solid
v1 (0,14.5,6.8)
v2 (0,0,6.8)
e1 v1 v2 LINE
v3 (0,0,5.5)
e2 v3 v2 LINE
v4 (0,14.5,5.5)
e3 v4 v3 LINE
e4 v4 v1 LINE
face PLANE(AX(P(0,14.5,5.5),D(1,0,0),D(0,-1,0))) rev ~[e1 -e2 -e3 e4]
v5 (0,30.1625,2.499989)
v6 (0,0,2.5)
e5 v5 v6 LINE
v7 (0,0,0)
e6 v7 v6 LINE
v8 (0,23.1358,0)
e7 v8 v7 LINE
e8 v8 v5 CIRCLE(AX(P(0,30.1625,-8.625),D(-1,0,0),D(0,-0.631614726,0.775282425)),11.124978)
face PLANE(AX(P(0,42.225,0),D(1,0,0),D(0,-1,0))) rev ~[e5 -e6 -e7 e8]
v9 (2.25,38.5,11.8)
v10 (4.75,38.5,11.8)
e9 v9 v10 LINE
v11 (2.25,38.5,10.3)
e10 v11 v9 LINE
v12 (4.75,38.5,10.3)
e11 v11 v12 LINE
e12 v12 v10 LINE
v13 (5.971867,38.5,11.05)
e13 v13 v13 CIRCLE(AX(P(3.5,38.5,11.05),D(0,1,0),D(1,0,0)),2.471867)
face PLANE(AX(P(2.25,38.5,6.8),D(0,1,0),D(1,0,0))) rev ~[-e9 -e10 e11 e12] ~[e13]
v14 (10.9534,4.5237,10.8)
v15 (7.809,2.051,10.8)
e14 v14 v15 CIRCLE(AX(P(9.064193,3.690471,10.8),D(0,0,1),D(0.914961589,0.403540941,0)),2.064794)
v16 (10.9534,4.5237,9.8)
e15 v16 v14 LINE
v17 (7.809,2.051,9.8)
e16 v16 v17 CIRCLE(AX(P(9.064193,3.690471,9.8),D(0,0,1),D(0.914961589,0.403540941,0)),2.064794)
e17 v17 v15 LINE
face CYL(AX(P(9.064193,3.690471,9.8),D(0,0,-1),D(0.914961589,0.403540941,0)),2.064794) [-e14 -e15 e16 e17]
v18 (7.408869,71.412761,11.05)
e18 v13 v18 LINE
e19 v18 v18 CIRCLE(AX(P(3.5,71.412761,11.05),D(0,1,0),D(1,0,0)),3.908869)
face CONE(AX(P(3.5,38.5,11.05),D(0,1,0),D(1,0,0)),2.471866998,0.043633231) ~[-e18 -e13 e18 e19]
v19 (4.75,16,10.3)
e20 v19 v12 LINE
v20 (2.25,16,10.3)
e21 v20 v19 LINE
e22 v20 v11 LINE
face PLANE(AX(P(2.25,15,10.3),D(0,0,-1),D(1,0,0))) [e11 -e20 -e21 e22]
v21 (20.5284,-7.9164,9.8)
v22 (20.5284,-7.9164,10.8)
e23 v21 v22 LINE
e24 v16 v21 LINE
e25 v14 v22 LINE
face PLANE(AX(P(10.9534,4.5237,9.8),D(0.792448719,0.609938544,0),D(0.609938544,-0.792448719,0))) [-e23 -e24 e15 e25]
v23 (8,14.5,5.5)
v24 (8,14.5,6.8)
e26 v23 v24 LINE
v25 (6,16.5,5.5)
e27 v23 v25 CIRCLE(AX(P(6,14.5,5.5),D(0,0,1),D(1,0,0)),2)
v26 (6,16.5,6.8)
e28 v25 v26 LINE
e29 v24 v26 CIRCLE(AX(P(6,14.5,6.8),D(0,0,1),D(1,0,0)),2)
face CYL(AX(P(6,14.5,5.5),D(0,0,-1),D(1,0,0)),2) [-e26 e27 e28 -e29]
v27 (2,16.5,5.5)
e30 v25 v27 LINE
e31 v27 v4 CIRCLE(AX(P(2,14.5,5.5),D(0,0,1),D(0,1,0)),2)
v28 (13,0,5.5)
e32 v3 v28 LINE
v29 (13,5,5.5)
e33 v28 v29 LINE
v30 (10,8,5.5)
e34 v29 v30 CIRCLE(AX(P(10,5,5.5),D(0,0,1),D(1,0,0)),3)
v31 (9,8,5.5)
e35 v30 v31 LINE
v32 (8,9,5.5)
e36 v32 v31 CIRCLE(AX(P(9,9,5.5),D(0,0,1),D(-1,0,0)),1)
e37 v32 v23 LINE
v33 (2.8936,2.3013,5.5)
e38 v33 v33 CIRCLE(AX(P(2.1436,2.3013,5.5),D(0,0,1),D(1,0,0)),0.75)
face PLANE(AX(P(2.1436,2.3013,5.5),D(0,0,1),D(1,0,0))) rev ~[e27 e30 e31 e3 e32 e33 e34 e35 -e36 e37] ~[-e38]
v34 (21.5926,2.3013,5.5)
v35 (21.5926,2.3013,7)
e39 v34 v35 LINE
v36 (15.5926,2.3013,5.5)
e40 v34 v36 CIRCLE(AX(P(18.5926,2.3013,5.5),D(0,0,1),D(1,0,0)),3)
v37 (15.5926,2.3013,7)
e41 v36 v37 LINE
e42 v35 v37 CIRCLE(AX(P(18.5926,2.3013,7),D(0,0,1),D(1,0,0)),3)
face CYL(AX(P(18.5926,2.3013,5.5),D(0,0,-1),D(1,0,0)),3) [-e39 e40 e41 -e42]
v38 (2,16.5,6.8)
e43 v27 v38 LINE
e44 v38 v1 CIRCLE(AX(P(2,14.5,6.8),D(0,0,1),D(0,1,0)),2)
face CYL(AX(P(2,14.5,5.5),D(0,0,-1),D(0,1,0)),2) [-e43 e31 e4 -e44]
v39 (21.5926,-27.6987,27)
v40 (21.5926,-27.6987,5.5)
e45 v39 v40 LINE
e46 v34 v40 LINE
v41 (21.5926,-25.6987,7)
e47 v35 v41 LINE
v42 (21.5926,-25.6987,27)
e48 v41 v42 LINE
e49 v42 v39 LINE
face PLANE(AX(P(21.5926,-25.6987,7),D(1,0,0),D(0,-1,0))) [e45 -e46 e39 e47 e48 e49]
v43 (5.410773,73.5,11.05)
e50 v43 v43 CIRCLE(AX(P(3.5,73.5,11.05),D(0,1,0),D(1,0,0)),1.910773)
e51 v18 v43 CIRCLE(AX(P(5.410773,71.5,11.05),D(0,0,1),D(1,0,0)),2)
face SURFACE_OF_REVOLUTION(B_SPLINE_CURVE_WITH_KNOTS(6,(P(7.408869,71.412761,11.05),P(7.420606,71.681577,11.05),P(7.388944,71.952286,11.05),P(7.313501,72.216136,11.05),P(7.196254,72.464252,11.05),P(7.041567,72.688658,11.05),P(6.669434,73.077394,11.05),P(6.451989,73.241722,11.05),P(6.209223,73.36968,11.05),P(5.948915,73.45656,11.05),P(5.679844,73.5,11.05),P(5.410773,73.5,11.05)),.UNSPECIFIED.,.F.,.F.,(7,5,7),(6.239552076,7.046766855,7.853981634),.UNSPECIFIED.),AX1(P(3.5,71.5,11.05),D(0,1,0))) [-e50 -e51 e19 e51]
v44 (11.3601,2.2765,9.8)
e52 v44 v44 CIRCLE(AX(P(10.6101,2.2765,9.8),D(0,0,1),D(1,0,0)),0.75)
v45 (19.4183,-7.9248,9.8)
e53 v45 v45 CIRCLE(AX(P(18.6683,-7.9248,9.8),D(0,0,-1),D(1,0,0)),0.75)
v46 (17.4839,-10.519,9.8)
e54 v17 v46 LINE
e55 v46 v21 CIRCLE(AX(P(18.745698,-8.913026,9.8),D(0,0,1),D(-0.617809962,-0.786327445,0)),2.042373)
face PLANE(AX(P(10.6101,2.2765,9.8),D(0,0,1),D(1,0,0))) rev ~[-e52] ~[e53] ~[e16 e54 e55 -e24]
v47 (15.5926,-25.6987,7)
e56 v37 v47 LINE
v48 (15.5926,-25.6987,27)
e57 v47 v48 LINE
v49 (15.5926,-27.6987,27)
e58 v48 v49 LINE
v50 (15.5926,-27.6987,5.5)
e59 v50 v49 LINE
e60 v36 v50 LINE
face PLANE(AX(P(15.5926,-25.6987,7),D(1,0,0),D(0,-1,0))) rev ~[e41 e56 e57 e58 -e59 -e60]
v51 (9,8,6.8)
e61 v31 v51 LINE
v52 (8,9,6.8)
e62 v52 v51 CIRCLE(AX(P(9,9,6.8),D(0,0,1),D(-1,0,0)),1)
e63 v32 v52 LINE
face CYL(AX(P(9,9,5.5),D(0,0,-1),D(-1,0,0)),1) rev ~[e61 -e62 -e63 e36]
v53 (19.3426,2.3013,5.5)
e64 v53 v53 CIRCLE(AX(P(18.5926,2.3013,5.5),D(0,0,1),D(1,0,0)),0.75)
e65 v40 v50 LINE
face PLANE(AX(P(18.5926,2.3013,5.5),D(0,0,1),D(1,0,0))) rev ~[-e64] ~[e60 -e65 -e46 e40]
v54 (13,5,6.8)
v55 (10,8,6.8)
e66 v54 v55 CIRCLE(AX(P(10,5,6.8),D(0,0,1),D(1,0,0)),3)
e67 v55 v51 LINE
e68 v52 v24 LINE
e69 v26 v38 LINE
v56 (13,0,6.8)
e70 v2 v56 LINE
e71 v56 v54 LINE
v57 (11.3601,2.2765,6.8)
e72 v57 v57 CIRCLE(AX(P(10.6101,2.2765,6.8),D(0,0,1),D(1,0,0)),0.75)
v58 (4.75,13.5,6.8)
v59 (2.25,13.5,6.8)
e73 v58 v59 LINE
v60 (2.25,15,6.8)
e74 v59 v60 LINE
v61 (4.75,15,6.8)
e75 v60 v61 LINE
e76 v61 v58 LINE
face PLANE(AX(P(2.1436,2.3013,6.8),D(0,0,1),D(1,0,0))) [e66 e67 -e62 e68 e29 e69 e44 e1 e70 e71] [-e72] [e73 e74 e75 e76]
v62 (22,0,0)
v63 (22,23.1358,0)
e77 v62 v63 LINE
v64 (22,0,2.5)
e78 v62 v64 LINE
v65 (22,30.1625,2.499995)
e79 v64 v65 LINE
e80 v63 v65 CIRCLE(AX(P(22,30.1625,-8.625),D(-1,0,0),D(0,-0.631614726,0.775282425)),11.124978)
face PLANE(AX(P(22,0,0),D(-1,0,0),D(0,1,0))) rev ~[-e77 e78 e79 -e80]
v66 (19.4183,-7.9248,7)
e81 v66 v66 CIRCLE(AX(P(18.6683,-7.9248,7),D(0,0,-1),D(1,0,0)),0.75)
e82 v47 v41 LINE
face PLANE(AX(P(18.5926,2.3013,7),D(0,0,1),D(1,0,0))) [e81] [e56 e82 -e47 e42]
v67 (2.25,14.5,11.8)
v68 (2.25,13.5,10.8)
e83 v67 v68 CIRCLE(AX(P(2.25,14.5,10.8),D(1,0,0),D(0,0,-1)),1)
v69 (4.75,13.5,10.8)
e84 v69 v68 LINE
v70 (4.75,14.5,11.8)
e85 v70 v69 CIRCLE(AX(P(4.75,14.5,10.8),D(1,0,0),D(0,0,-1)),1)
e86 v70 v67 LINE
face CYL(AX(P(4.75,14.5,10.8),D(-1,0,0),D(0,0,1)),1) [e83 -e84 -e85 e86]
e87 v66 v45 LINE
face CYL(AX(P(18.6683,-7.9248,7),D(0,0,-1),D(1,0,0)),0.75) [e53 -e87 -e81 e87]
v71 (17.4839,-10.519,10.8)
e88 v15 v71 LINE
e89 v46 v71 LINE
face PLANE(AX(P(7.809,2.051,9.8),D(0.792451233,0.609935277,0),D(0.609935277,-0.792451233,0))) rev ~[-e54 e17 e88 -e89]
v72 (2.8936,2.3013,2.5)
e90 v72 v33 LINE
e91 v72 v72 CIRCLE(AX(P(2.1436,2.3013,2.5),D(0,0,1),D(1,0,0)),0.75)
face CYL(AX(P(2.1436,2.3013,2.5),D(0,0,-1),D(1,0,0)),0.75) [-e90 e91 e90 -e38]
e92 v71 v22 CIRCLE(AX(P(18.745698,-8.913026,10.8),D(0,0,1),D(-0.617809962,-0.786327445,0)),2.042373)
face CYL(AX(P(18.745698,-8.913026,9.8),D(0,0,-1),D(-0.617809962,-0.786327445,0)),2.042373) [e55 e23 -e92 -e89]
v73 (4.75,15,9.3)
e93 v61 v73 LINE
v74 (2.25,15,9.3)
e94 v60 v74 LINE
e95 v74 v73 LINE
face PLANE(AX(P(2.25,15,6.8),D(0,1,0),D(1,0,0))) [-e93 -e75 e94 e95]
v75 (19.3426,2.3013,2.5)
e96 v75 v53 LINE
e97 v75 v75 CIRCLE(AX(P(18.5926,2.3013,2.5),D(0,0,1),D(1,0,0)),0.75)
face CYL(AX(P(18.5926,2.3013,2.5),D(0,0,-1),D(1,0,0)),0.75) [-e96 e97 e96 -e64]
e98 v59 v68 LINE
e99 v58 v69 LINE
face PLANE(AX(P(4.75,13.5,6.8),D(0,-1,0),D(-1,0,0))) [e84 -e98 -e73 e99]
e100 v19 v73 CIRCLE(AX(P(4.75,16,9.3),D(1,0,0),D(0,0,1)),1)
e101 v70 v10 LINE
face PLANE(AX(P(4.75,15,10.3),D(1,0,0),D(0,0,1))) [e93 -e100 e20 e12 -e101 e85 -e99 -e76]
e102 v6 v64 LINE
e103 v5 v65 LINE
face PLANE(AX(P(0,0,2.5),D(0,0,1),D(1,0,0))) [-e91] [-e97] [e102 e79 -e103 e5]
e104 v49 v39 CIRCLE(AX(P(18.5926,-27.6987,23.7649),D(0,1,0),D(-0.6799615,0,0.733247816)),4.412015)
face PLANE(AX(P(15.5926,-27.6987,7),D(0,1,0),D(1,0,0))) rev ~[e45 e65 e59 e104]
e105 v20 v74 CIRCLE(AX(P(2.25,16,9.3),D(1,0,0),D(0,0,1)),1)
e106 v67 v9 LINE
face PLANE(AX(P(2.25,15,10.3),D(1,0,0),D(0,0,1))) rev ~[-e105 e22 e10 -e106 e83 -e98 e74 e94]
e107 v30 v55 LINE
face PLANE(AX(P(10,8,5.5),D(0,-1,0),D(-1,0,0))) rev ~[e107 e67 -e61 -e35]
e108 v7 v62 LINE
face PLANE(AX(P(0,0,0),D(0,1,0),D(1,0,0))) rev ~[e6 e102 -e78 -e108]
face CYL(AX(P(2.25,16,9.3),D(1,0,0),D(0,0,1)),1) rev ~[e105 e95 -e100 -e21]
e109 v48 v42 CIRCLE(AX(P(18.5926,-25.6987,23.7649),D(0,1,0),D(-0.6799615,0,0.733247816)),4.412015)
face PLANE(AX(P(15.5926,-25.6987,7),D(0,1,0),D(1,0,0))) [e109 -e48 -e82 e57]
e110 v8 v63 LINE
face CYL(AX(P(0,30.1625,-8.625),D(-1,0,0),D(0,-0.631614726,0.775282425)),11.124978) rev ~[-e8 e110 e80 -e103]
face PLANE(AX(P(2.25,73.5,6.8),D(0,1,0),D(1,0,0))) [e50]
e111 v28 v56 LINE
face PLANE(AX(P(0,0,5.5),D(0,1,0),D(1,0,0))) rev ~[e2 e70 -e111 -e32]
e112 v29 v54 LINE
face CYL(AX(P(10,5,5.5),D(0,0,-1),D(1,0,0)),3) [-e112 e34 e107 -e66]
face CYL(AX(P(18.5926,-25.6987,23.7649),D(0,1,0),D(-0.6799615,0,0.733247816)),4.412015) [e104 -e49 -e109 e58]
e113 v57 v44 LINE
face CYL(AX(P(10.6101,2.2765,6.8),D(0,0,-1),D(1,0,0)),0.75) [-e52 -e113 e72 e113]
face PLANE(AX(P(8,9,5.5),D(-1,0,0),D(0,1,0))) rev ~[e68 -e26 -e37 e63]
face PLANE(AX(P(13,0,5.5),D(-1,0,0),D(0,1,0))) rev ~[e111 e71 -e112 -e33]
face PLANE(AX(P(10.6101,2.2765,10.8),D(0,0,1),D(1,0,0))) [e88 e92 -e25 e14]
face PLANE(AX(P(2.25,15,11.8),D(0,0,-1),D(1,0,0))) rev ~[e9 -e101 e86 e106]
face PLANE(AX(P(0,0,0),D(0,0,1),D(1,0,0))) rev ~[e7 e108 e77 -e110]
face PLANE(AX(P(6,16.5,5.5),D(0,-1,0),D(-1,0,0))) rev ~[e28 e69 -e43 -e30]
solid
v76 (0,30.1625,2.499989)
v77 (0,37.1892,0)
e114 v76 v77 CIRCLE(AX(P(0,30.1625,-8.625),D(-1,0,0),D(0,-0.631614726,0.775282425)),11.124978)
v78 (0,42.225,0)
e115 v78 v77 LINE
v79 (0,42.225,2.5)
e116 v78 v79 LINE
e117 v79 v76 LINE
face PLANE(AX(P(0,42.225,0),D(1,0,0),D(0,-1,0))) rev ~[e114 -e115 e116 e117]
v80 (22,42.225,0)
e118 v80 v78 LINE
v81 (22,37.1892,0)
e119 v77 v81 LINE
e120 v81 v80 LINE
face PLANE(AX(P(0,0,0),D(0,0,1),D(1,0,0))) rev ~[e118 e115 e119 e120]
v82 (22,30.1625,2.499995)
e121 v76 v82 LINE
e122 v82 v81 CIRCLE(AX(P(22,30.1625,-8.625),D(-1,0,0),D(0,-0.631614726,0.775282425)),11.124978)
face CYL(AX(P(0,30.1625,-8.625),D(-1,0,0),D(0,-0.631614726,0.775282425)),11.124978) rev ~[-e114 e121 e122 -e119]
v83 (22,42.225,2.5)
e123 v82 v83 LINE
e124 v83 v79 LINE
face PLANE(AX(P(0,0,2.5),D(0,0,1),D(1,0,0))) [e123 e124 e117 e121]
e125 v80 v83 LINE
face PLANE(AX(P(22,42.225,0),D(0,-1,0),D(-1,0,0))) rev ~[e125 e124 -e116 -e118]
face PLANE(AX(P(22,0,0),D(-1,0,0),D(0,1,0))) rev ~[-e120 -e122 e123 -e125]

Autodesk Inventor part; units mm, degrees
ref_plane "YZ Plane" through (0, 0, 0) normal (1, 0, 0) x (0, 1, 0)
ref_plane "XZ Plane" through (0, 0, 0) normal (0, 1, 0) x (-1, 0, 0)
ref_plane "XY Plane" through (0, 0, 0) normal (0, 0, 1) x (1, 0, 0)
sketch "Sketch1" plane through (0, 0, 0) normal (0, 0, 1) x (1, 0, 0)
  line L0 (0, 42.225) -> (0, 0)
  line L1 (0, 0) -> (22, 0)
  line L2 (22, 0) -> (22, 42.225)
  line L3 (22, 42.225) -> (0, 42.225)
  dimension "d0" = 22
  dimension "d1" = 42.225
extrude "Extrusion1" add sketch "Sketch1" along normal blind 2.5
sketch "Sketch2" plane through (0, 0, 0) normal (-1, 0, 0) x (0, 0, 1)
  line L0 (2.5, 0) -> (2.5, 42.225) projected
  arc A0 (0, 23.1358) -> (0, 37.1892) centre (-8.625, 30.1625) ccw
  line L1 (0, 0) -> (0, 42.225) projected
  line L2 (0, 23.1358) -> (0, 37.1892)
  dimension "d62" = 22.25
  dimension "d63" = 0
extrude "Extrusion2" cut sketch "Sketch2" against normal through all
sketch "Sketch3" plane through (0, 0, 2.5) normal (0, 0, 1) x (1, 0, 0)
  circle A0 centre (2.1436, 2.3013) radius 0.75
  point P0 (0, 0)
  dimension "d7" = 1.5
extrude "Extrusion3" add sketch "Sketch3" along normal blind 3
sketch "Sketch4" plane through (2.1436, 2.3013, 5.5) normal (0, 0, 1) x (1, 0, 0)
  line L0 (-2.1436, -2.3013) -> (19.8564, -2.3013) projected
  line L1 (-2.1436, -2.3013) -> (10.8564, -2.3013)
  line L2 (10.8564, -2.3013) -> (10.8564, 2.6987)
  line L3 (7.8564, 5.6987) -> (6.8564, 5.6987)
  line L4 (5.8564, 6.6987) -> (5.8564, 12.1987)
  line L5 (3.8564, 14.1987) -> (-0.1436, 14.1987)
  line L6 (-2.1436, 39.9237) -> (-2.1436, -2.3013) projected
  line L7 (-2.1436, -2.3013) -> (-2.1436, 12.1987)
  arc A0 (-0.1436, 14.1987) -> (-2.1436, 12.1987) centre (-0.1436, 12.1987) ccw
  arc A1 (5.8564, 12.1987) -> (3.8564, 14.1987) centre (3.8564, 12.1987) ccw
  arc A2 (5.8564, 6.6987) -> (6.8564, 5.6987) centre (6.8564, 6.6987) ccw
  arc A3 (10.8564, 2.6987) -> (7.8564, 5.6987) centre (7.8564, 2.6987) ccw
  point P0 (-2.1436, 14.1987)
  point P1 (-2.1436, 17.6987)
  point P2 (8.8564, -2.3013)
  dimension "d10" = 8
  dimension "d11" = 8
  dimension "d12" = 16.5
  dimension "d13" = 13
  dimension "d14" = 2
  dimension "d15" = 2
  dimension "d16" = 1
  dimension "d17" = 3
extrude "Extrusion4" add sketch "Sketch4" along normal blind 1.3
sketch "Sketch5" plane through (2.1436, 2.3013, 6.8) normal (0, 0, 1) x (1, 0, 0)
  point P0 (-2.1436, -2.3013)
sketch "Sketch6" plane through (0, 0, 2.5) normal (0, 0, 1) x (1, 0, 0)
  circle A0 centre (18.5926, 2.3013) radius 0.75
  point P0 (0, 0)
  dimension "d20" = 1.5
extrude "Extrusion5" add sketch "Sketch6" along normal blind 3
sketch "Sketch7" plane through (18.5926, 2.3013, 5.5) normal (0, 0, 1) x (1, 0, 0)
  circle A0 centre (0, 0) radius 0.75 projected
  line L0 (0, 0) -> (6, 0)
  line L1 (0, 0) -> (3, 0)
  line L2 (3, 0) -> (3, -30)
  line L3 (3, -30) -> (0, -30)
  line L4 (0, -0.75) -> (0, 0)
  line L5 (0, 0) -> (-3, 0)
  line L6 (-3, 0) -> (-3, -30)
  line L7 (-3, -30) -> (0, -30)
  line L8 (0, -0.75) -> (0, 0)
  arc A1 (3, 0) -> (-3, 0) centre (0, 0) ccw
  point P0 (-18.5926, -2.3013)
  point P1 (-1.5, -30)
  point P2 (0, -30)
  dimension "d23" = 3
  dimension "d24" = 3
  dimension "d25" = 30
extrude "Extrusion6" add sketch "Sketch7" along normal blind 1.5
sketch "Sketch8" plane through (2.1436, 2.3013, 6.8) normal (0, 0, 1) x (1, 0, 0)
  circle A0 centre (8.4665, -0.0248) radius 0.75
  point P0 (-2.1436, -2.3013)
  dimension "d28" = 1.5
extrude "Extrusion7" add sketch "Sketch8" along normal blind 3
sketch "Sketch9" plane through (2.1436, 2.3013, 6.8) normal (0, 0, 1) x (1, 0, 0)
  line L0 (0.1064, 12.6987) -> (2.6064, 12.6987)
  line L1 (2.6064, 12.6987) -> (2.6064, 11.1987)
  line L2 (2.6064, 11.1987) -> (0.1064, 11.1987)
  line L3 (0.1064, 11.1987) -> (0.1064, 12.6987)
  line L4 (3.8564, 14.1987) -> (-0.1436, 14.1987) projected
  line L5 (-2.1436, 12.1987) -> (-2.1436, -2.3013) projected
  dimension "d31" = 2.5
  dimension "d32" = 1.5
  dimension "d33" = 1.5
  dimension "d34" = 2.25
extrude "Extrusion8" add sketch "Sketch9" along normal blind 5
sketch "Sketch10" plane through (2.25, 13.5, 6.8) normal (-1, 0, 0) x (0, 0, 1)
  point P0 (-6.8, -13.5)
sketch "Sketch11" plane through (2.25, 15, 6.8) normal (0, 1, 0) x (1, 0, 0)
  line L0 (0, -5) -> (2.5, -5) projected
  line L1 (0, 0) -> (0, -5) projected
  line L2 (2.5, -5) -> (0, -5)
  line L3 (0, -5) -> (0, -3.5)
  line L4 (0, -3.5) -> (2.5, -3.5)
  line L5 (2.5, -3.5) -> (2.5, -5)
  point P0 (-2.25, 6.8)
  dimension "d37" = 1.5
extrude "Extrusion9" add sketch "Sketch11" along normal blind 23.5
fillet "Fillet1" radius 1 1 edges at (3.5, 13.5, 11.8)
fillet "Fillet2" radius 1 1 edges at (3.5, 15, 10.3)
sketch "Sketch12" plane through (2.25, 38.5, 6.8) normal (0, 1, 0) x (1, 0, 0)
  line L0 (2.5, -5) -> (0, -5) projected
  line L1 (1.25, -5) -> (1.25, -4.25)
  circle A0 centre (1.25, -4.25) radius 4
  point P0 (-2.25, 6.8)
  dimension "d42" = 0.75
  dimension "d43" = 8
extrude "Extrusion10" add sketch "Sketch12" along normal blind 35
draft "FaceDraft1" angle 2.5 pull direction (0, -1, 0) faces at (7.487, 61.8333, 11.3719) fixed edges at (-0.5, 73.5, 11.05)
fillet "Fillet3" radius 2 1 edges at (-0.5, 73.5, 11.05)
sketch "Sketch13" plane through (18.5926, 2.3013, 7) normal (0, 0, 1) x (1, 0, 0)
  circle A0 centre (-7.9825, -0.0248) radius 0.75 projected
  circle A1 centre (0.0757, -10.2261) radius 0.75
  line L0 (-7.9825, -0.0248) -> (-7.5176, -0.6133)
  line L1 (-0.3892, -9.6376) -> (0.0757, -10.2261)
  point P0 (-18.5926, -2.3013)
  dimension "d49" = 1.5
  dimension "d48" = 13
extrude "Extrusion11" add sketch "Sketch13" along normal blind 3 contours A1
sketch "Sketch14" plane through (10.6101, 2.2765, 9.8) normal (0, 0, 1) x (1, 0, 0)
  line L0 (-2.8011, -0.2255) -> (6.8738, -12.7955)
  line L1 (10.9825, -29.9752) -> (10.9825, 0.0248) projected
  line L2 (0.3433, 2.2472) -> (9.9183, -10.1929)
  arc A0 (0.3433, 2.2472) -> (-2.8011, -0.2255) centre (-1.5459, 1.414) ccw
  arc A1 (6.8738, -12.7955) -> (9.9183, -10.1929) centre (8.1356, -11.1896) ccw
  point P0 (-10.6101, -2.2765)
  dimension "d52" = 4
extrude "Extrusion12" add sketch "Sketch14" along normal blind 1
sketch "Sketch15" plane through (18.5926, 2.3013, 7) normal (0, 0, 1) x (1, 0, 0)
  line L0 (-3, 0) -> (-3, -30) projected
  line L1 (-3, -28) -> (3, -28)
  line L2 (3, -28) -> (3, -30)
  line L3 (3, -30) -> (-3, -30)
  line L4 (-3, -30) -> (-3, -28)
  point P0 (-18.5926, -2.3013)
  dimension "d56" = 2
extrude "Extrusion13" add sketch "Sketch15" along normal blind 20
sketch "Sketch16" plane through (15.5926, -25.6987, 7) normal (0, 1, 0) x (1, 0, 0)
  line L0 (0, -20) -> (6, -20) projected
  arc A0 (0, -20) -> (6, -20) centre (3, -16.7649) ccw
  point P0 (-15.5926, 7)
  dimension "d59" = 4.412
extrude "Extrusion14" add sketch "Sketch16" against normal blind 2
properties part number "G26 P999999"
